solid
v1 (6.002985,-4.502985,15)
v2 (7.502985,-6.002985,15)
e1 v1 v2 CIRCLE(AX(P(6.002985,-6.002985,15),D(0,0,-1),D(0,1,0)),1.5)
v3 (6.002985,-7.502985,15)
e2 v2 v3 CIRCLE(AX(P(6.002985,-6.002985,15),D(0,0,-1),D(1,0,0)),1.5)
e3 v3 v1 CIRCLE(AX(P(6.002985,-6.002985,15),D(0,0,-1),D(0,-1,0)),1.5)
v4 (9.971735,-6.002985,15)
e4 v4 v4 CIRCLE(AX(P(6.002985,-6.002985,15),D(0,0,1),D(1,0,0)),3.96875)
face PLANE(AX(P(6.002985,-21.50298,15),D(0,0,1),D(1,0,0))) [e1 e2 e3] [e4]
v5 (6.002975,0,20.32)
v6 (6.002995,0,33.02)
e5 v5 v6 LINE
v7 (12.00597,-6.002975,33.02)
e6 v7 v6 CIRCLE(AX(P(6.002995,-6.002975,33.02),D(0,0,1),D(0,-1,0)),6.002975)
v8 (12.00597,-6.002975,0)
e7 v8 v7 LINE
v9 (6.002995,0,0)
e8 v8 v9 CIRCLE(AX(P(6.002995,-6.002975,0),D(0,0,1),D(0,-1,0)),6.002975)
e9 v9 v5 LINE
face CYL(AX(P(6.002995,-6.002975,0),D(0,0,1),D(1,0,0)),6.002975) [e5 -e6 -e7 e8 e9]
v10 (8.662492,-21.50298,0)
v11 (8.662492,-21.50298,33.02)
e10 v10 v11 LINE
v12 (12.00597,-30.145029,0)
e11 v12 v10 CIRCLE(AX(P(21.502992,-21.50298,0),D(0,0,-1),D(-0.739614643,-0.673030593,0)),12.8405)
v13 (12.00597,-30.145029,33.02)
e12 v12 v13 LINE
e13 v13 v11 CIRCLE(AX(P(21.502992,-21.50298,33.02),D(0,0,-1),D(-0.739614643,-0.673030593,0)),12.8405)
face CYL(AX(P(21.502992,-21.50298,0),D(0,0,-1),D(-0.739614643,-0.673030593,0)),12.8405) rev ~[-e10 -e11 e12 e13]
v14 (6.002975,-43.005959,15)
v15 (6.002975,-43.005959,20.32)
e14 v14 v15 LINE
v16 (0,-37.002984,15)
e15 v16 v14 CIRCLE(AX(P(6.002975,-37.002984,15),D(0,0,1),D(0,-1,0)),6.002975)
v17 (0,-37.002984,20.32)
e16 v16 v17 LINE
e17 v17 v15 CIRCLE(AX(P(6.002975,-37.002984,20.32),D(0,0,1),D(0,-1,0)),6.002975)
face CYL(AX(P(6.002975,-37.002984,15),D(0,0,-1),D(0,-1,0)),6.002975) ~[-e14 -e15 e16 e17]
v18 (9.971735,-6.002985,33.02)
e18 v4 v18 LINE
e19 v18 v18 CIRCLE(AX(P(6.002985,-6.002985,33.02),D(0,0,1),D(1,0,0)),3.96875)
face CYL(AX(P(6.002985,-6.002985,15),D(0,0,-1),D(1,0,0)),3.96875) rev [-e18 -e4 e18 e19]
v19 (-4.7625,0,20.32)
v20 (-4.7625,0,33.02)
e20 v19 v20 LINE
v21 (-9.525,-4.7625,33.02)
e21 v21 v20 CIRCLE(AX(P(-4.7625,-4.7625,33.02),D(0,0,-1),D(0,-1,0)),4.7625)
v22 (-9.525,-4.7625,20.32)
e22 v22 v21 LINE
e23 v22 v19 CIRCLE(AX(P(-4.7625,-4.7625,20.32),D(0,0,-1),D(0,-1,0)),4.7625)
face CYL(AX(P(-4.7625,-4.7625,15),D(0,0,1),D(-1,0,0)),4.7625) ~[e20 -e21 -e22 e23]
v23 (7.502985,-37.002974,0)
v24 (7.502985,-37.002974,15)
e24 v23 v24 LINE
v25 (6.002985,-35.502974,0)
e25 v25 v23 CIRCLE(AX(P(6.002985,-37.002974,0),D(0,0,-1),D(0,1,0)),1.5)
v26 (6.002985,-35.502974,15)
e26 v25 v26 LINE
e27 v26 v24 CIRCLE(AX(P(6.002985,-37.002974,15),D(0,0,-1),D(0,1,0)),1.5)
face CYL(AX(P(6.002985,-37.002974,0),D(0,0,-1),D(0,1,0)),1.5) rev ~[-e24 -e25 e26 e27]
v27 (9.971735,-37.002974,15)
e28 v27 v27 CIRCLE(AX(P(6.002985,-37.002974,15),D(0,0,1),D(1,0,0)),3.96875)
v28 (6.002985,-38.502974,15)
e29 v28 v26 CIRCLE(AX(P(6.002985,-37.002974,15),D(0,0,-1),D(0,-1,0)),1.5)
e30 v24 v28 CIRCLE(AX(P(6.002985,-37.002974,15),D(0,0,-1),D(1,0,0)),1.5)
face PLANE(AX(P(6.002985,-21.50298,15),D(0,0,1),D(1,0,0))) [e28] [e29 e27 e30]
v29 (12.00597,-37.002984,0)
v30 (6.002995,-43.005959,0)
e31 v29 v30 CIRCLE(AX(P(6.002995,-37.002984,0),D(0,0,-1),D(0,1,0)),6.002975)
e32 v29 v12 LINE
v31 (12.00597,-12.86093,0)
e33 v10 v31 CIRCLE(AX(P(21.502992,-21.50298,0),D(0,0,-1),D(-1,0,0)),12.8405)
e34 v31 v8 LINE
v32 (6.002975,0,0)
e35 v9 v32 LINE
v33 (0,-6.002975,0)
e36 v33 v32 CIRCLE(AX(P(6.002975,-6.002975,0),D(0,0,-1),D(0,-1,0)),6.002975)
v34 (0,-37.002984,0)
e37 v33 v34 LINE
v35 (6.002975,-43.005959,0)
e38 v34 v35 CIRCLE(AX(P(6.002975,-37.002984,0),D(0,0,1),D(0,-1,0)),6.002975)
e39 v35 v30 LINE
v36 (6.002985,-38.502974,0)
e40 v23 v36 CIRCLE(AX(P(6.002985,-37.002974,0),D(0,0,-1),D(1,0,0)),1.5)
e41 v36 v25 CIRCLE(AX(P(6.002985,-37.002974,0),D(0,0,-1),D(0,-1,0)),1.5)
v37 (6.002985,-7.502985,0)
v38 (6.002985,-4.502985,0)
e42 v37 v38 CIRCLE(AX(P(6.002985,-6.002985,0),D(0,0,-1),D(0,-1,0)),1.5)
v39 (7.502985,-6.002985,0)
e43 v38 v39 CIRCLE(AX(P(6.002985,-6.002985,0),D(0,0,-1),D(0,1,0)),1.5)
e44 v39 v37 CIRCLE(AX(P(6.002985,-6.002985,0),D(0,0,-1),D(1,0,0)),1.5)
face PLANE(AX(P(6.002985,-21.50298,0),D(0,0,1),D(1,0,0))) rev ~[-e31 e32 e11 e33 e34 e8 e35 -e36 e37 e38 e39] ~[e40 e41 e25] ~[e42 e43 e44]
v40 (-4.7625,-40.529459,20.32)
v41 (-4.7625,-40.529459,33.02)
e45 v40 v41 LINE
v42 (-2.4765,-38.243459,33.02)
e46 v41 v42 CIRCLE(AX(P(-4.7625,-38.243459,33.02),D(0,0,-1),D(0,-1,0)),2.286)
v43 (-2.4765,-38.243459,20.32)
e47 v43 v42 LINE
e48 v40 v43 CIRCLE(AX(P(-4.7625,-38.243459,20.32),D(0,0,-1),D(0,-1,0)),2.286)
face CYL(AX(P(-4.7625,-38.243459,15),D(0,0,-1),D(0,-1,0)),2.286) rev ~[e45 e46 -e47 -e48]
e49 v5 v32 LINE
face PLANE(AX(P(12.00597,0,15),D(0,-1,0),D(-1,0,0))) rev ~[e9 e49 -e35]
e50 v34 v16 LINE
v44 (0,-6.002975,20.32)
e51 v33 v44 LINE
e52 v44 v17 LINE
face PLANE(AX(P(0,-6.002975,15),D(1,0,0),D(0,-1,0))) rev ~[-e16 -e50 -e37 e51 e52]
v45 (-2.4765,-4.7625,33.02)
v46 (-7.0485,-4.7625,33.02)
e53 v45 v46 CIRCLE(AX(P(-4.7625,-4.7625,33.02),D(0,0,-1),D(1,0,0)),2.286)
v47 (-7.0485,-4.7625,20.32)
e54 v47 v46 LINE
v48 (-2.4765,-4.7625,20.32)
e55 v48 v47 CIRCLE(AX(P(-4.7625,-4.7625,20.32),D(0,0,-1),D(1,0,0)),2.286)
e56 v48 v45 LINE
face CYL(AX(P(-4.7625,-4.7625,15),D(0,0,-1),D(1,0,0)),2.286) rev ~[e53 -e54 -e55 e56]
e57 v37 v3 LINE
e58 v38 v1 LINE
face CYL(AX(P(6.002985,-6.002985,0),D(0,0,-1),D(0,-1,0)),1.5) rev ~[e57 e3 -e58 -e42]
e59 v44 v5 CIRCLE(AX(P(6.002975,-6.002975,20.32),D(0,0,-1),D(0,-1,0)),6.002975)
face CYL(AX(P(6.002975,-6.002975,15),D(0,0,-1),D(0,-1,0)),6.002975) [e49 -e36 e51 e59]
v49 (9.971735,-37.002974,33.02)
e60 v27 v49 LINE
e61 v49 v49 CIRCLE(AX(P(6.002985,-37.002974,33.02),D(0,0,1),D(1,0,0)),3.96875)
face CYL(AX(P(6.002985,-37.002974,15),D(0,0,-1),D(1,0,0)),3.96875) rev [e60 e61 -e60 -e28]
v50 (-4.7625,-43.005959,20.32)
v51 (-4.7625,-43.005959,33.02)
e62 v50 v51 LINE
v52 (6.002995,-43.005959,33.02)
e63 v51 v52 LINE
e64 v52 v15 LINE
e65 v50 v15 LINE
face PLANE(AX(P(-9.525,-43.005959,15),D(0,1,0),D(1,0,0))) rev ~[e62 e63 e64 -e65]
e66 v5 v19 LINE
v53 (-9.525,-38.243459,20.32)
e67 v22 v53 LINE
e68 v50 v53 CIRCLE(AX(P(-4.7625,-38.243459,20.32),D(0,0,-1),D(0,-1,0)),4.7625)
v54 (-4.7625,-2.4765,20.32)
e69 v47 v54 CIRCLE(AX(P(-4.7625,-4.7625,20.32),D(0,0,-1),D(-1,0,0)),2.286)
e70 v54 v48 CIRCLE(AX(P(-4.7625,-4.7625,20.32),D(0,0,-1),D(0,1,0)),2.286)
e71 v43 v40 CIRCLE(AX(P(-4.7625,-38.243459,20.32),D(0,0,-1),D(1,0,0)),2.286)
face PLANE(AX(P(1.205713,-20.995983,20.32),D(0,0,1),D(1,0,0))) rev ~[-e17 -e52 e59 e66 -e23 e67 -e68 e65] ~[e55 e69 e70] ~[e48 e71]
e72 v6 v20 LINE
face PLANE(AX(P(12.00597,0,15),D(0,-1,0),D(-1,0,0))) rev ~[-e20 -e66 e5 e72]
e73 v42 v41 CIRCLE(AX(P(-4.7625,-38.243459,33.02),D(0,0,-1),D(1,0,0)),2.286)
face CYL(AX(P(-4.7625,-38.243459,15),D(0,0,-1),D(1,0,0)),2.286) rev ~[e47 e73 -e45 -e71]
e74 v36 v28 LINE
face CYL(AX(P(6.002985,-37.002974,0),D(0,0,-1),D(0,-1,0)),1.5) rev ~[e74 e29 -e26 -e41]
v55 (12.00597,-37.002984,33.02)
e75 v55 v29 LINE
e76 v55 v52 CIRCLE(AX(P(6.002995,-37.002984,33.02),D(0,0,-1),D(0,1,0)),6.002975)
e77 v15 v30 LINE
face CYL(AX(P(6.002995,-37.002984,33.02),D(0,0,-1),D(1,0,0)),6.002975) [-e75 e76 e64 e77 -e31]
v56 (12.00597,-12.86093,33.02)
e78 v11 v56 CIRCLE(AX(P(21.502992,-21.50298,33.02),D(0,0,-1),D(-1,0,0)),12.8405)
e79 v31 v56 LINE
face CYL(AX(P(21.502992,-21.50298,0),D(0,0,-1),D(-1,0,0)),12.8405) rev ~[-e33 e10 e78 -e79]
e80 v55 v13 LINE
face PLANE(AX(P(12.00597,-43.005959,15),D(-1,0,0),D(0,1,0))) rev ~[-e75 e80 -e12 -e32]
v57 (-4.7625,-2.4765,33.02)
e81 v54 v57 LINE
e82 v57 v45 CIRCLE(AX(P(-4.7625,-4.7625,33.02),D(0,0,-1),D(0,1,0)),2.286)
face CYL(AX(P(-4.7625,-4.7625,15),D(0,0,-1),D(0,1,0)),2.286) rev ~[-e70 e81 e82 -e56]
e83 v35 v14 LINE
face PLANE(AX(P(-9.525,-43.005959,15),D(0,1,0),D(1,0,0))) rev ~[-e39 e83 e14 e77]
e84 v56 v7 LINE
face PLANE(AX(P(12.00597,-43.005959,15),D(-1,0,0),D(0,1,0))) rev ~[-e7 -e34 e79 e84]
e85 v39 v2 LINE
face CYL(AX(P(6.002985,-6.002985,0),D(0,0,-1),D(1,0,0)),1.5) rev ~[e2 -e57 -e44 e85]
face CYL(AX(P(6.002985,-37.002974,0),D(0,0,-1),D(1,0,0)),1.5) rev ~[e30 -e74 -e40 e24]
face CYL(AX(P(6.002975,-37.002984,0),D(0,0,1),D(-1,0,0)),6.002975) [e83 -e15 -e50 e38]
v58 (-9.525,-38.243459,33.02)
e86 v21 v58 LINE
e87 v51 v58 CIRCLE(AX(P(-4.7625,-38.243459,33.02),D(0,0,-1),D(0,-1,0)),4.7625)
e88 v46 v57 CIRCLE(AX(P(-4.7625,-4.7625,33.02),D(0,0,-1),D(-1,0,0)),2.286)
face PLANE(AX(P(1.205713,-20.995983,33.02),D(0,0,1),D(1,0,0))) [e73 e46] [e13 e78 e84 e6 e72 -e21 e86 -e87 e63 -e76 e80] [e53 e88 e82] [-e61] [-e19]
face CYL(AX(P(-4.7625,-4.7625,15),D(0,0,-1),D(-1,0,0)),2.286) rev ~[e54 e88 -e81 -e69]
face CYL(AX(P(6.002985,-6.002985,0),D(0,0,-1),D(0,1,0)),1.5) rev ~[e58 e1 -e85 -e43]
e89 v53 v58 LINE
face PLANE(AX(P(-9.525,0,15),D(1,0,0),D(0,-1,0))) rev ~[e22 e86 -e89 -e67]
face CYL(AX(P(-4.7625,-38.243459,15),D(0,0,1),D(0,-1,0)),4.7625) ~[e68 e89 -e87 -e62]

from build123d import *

# Parameters (mm, degrees)
F1_DEPTH = 15
F2_R     = 3.96875
F3_DEPTH = 18.02
F4_R     = 6.002975
F5_R     = 4.7625
F7_DEPTH = 33.02
F8_DEPTH = 5.32


# Not quite as in the source:
# - a fillet or chamfer is up to 0.001 mm smaller than in the source, because OpenCascade refuses the exact size


with BuildPart() as f1:
    # F0 (on Top) → F1 (new body)
    with BuildSketch(Plane.XY):
        Polygon((6.0029852, 0), (0, 0), (0, -43.0059592), (6.0029852, -43.0059592), (12.0059704, -43.0059592), (12.0059704, 0), align=None)
        with BuildLine():
            ThreePointArc((7.5029852, -37.002974), (7.0636453718, -38.0636341718), (6.0029852, -38.502974))
            ThreePointArc((6.0029852, -38.502974), (4.5029852, -37.002974), (6.0029852, -35.502974))
            ThreePointArc((6.0029852, -35.502974), (7.0636453718, -35.9423138282), (7.5029852, -37.002974))
        make_face(mode=Mode.SUBTRACT)
        with BuildLine():
            ThreePointArc((6.0029852, -7.5029852), (4.5029852, -6.0029852), (6.0029852, -4.5029852))
            ThreePointArc((6.0029852, -4.5029852), (7.0636453718, -4.9423250282), (7.5029852, -6.0029852))
            ThreePointArc((7.5029852, -6.0029852), (7.0636453718, -7.0636453718), (6.0029852, -7.5029852))
        make_face(mode=Mode.SUBTRACT)
    extrude(amount=F1_DEPTH)

    # F2 (on face) → F3 (join)
    with BuildSketch(Plane.XY.offset(15)):
        with BuildLine():
            Line((12.0059704, -43.0059592), (12.0059704, 0))
            Line((12.0059704, 0), (-4.7625, 0))
            Line((-4.7625, 0), (-4.7625, -2.4765))
            ThreePointArc((-4.7625, -2.4765), (-3.1460538982, -3.1460538982), (-2.4765, -4.7625))
            ThreePointArc((-2.4765, -4.7625), (-4.7625, -7.0485), (-7.0485, -4.7625))
            Line((-7.0485, -4.7625), (-9.525, -4.7625))
            Line((-9.525, -4.7625), (-9.525, -43.0059592))
            Line((-9.525, -43.0059592), (-4.7625, -43.0059592))
            Line((-4.7625, -43.0059592), (12.0059704, -43.0059592))
        make_face()
        with BuildLine():
            ThreePointArc((-2.4765, -38.2434592), (-3.1460538982, -39.8599053018), (-4.7625, -40.5294592))
            ThreePointArc((-4.7625, -40.5294592), (-6.3789461018, -36.6270130982), (-2.4765, -38.2434592))
        make_face(mode=Mode.SUBTRACT)
        with Locations((6.0029852, -37.002974)):
            Circle(F2_R, mode=Mode.SUBTRACT)
        with Locations((6.0029852, -6.0029852)):
            Circle(F2_R, mode=Mode.SUBTRACT)
        with BuildLine():
            Line((-4.7625, -2.4765), (-4.7625, 0))
            Line((-4.7625, 0), (-9.525, 0))
            Line((-9.525, 0), (-9.525, -4.7625))
            Line((-9.525, -4.7625), (-7.0485, -4.7625))
            ThreePointArc((-7.0485, -4.7625), (-6.3789461018, -3.1460538982), (-4.7625, -2.4765))
        make_face()
    extrude(amount=F3_DEPTH)

    # F4 (radius 6.0029852 in the source; OpenCascade refuses exactly that, so slightly less here)
    f4_edges = [f1.edges().sort_by_distance(p)[0] for p in [
        (12.00597, 0, 16.51),
        (0, 0, 7.5),
        (0, -43.005959, 7.5),
        (12.00597, -43.005959, 16.51),
    ]]
    fillet(f4_edges, radius=F4_R)

    # F5
    f5_edges = [f1.edges().sort_by_distance(p)[0] for p in [
        (-9.525, -43.005959, 24.01),
        (-9.525, 0, 24.01),
    ]]
    fillet(f5_edges, radius=F5_R)

    # F6 (on face) → F7 (cut, through all)
    with BuildSketch(Plane(origin=(0, 0, 0), x_dir=(1, 0, 0), z_dir=(0, 0, -1))):
        with BuildLine():
            ThreePointArc((12.0059704, 30.145029001), (9.5274974569, 26.1361174223), (8.6624922, 21.5029796))
            Line((8.6624922, 21.5029796), (12.0059704, 21.5029796))
            Line((12.0059704, 21.5029796), (12.0059704, 30.145029001))
        make_face()
        with BuildLine():
            Line((12.0059704, 21.5029796), (8.6624922, 21.5029796))
            ThreePointArc((8.6624922, 21.5029796), (9.5274974569, 16.8698417777), (12.0059704, 12.860930199))
            Line((12.0059704, 12.860930199), (12.0059704, 21.5029796))
        make_face()
    extrude(amount=-F7_DEPTH, mode=Mode.SUBTRACT)

    # F8 (cut): a face of the model
    f8_faces = [f1.faces().sort_by_distance(p)[0] for p in [
        (-4.4215962699, -21.5029796, 15),
    ]]
    extrude(f8_faces, amount=-F8_DEPTH, mode=Mode.SUBTRACT)


solid = f1.part
